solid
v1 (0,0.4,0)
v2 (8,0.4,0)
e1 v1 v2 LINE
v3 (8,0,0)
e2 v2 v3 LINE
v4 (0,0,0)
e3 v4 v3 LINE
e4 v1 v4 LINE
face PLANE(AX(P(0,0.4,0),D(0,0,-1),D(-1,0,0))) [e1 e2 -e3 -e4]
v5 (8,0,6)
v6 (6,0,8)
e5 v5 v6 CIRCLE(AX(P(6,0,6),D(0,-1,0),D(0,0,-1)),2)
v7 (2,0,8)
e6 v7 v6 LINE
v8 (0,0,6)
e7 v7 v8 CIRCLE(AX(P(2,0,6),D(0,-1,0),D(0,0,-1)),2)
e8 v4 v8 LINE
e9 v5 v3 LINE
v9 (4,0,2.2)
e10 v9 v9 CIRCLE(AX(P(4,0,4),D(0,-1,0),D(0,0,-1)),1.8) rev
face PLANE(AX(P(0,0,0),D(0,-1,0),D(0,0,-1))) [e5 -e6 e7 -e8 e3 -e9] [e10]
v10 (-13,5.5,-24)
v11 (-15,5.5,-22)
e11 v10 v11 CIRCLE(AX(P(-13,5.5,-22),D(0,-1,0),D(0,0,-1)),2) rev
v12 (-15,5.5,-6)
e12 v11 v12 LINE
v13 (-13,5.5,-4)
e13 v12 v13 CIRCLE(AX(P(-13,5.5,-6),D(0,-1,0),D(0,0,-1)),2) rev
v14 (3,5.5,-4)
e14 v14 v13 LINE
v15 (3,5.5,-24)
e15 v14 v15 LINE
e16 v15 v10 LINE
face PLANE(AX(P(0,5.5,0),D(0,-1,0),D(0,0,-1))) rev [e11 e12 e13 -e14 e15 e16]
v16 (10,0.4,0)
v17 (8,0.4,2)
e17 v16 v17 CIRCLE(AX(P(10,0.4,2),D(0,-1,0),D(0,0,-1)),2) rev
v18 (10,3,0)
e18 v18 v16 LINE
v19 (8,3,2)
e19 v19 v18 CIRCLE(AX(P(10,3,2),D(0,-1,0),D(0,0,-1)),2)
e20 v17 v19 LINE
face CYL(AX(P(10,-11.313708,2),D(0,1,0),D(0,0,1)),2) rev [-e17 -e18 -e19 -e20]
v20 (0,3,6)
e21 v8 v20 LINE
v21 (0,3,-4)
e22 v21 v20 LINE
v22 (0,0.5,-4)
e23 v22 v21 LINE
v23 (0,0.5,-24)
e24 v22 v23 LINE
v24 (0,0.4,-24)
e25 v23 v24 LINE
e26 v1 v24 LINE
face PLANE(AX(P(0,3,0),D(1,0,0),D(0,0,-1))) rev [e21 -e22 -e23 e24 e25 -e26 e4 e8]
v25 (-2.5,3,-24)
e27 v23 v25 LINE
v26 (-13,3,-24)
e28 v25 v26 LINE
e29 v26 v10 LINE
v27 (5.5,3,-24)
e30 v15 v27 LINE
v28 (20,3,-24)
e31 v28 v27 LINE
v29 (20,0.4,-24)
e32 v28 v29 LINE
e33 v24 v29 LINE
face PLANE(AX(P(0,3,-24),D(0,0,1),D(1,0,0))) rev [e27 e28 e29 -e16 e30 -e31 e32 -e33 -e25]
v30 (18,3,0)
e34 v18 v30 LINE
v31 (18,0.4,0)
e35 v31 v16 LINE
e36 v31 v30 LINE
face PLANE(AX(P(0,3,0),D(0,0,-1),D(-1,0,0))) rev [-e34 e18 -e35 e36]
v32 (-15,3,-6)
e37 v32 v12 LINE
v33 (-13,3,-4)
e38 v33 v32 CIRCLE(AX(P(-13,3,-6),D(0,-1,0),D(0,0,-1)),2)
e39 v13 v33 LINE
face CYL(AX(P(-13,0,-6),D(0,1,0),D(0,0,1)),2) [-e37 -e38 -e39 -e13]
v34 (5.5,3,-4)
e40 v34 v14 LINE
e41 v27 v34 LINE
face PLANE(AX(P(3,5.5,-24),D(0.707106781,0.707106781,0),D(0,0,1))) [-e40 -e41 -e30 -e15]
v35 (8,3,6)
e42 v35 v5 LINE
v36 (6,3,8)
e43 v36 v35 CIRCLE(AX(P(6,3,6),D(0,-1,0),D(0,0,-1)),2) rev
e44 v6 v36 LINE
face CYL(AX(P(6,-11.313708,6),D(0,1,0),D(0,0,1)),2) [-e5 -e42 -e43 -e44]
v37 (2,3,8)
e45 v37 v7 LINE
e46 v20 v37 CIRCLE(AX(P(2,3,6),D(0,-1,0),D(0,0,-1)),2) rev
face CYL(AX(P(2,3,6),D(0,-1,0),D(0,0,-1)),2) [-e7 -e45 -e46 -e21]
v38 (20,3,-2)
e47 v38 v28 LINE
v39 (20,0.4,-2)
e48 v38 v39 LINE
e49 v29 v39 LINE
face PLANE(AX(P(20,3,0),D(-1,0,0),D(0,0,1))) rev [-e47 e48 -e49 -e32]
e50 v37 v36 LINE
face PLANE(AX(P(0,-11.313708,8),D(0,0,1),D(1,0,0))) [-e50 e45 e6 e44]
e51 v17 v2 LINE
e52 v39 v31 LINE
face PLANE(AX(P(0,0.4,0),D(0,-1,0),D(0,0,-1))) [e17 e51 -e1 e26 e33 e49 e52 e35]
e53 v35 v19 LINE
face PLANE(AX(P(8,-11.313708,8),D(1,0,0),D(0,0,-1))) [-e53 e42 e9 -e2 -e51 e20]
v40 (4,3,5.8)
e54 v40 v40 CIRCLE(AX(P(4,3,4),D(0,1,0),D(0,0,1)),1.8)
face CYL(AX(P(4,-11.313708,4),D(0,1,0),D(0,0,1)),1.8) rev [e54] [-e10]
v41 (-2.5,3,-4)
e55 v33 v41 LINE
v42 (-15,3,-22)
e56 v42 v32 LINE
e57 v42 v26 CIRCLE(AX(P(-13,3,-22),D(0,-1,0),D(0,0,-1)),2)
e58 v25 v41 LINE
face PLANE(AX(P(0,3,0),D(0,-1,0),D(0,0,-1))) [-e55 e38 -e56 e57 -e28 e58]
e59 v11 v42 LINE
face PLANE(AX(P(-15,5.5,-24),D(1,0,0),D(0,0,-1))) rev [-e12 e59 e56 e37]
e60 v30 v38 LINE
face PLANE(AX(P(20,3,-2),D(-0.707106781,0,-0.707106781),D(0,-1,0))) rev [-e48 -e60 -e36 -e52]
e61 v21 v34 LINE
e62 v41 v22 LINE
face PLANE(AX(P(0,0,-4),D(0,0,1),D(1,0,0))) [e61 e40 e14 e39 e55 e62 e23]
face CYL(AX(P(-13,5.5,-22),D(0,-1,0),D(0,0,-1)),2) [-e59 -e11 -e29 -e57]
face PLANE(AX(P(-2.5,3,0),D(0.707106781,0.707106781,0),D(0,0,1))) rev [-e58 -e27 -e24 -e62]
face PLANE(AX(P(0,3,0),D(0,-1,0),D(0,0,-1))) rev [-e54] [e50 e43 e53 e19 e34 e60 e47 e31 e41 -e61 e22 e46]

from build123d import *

# Parameters (mm, degrees)
SKETCH1_W           = 20
SKETCH1_H           = 24
BOSS_EXTRUDE1_DEPTH = 3
SKETCH2_W           = 8
SKETCH2_H           = 8
SKETCH2_R           = 1.8
BOSS_EXTRUDE2_DEPTH = 3
FILLET1_R           = 2
CHAMFER1_SIZE       = 2
SKETCH3_W           = 18
SKETCH3_H           = 24
BOSS_EXTRUDE3_DEPTH = 2.5
CHAMFER2_SIZE       = 2.5
CUT_EXTRUDE4_DEPTH  = 4
FILLET2_R           = 2
CUT_EXTRUDE3_DEPTH  = 0.4


with BuildPart() as part:
    # Sketch1 → Boss-Extrude1 (new body)
    with BuildSketch(Plane(origin=(0, 0, 0), x_dir=(1, 0, 0), z_dir=(0, 1, 0))):
        with Locations((10, 12)):
            Rectangle(SKETCH1_W, SKETCH1_H)
    extrude(amount=BOSS_EXTRUDE1_DEPTH)

    # Sketch2 → Boss-Extrude2 (add)
    with BuildSketch(Plane(origin=(0, 3, 0), x_dir=(1, 0, 0), z_dir=(0, 1, 0))):
        with Locations((4, -4)):
            Rectangle(SKETCH2_W, SKETCH2_H)
        with Locations(Location((4, -4, 0), (0, 0, 270))):
            Circle(SKETCH2_R, mode=Mode.SUBTRACT)
    extrude(amount=-BOSS_EXTRUDE2_DEPTH)

    # Fillet1
    fillet1_edges = [part.edges().sort_by_distance(p)[0] for p in [
        (8, 1.5, 0),
        (8, 1.5, 8),
        (0, 1.5, 8),
    ]]
    fillet(fillet1_edges, radius=FILLET1_R)

    # Chamfer1
    chamfer1_edges = [part.edges().sort_by_distance(p)[0] for p in [
        (20, 1.5, 0),
    ]]
    chamfer(chamfer1_edges, length=CHAMFER1_SIZE)

    # Sketch3 → Boss-Extrude3 (add)
    with BuildSketch(Plane(origin=(0, 3, 0), x_dir=(1, 0, 0), z_dir=(0, 1, 0))):
        with Locations((-6, 12)):
            Rectangle(SKETCH3_W, SKETCH3_H)
    extrude(amount=BOSS_EXTRUDE3_DEPTH)

    # Chamfer2
    chamfer2_edges = [part.edges().sort_by_distance(p)[0] for p in [
        (0, 3, -12),
        (3, 3, -12),
    ]]
    chamfer(chamfer2_edges, length=CHAMFER2_SIZE - 0.0001)  # a hair under: the kernel refuses the full size

    # Sketch5 → Cut-Extrude4 (cut)
    with BuildSketch(Plane.XY):
        Polygon((-15, 3), (-2.5, 3), (0, 0.5), (0, 3), (5.5, 3), (3, 5.5), (-15, 5.5), align=None)
    extrude(amount=-CUT_EXTRUDE4_DEPTH, mode=Mode.SUBTRACT)

    # Fillet2
    fillet2_edges = [part.edges().sort_by_distance(p)[0] for p in [
        (-15, 4.25, -24),
        (-15, 4.25, -4),
    ]]
    fillet(fillet2_edges, radius=FILLET2_R)

    # Sketch4 → Cut-Extrude3 (cut)
    with BuildSketch(Plane.XZ):
        Polygon((8, 2), (8, 0), (0, 0), (0, -24), (20, -24), (20, 0), (20, 2), align=None)
    extrude(amount=-CUT_EXTRUDE3_DEPTH, mode=Mode.SUBTRACT)


solid = part.part
